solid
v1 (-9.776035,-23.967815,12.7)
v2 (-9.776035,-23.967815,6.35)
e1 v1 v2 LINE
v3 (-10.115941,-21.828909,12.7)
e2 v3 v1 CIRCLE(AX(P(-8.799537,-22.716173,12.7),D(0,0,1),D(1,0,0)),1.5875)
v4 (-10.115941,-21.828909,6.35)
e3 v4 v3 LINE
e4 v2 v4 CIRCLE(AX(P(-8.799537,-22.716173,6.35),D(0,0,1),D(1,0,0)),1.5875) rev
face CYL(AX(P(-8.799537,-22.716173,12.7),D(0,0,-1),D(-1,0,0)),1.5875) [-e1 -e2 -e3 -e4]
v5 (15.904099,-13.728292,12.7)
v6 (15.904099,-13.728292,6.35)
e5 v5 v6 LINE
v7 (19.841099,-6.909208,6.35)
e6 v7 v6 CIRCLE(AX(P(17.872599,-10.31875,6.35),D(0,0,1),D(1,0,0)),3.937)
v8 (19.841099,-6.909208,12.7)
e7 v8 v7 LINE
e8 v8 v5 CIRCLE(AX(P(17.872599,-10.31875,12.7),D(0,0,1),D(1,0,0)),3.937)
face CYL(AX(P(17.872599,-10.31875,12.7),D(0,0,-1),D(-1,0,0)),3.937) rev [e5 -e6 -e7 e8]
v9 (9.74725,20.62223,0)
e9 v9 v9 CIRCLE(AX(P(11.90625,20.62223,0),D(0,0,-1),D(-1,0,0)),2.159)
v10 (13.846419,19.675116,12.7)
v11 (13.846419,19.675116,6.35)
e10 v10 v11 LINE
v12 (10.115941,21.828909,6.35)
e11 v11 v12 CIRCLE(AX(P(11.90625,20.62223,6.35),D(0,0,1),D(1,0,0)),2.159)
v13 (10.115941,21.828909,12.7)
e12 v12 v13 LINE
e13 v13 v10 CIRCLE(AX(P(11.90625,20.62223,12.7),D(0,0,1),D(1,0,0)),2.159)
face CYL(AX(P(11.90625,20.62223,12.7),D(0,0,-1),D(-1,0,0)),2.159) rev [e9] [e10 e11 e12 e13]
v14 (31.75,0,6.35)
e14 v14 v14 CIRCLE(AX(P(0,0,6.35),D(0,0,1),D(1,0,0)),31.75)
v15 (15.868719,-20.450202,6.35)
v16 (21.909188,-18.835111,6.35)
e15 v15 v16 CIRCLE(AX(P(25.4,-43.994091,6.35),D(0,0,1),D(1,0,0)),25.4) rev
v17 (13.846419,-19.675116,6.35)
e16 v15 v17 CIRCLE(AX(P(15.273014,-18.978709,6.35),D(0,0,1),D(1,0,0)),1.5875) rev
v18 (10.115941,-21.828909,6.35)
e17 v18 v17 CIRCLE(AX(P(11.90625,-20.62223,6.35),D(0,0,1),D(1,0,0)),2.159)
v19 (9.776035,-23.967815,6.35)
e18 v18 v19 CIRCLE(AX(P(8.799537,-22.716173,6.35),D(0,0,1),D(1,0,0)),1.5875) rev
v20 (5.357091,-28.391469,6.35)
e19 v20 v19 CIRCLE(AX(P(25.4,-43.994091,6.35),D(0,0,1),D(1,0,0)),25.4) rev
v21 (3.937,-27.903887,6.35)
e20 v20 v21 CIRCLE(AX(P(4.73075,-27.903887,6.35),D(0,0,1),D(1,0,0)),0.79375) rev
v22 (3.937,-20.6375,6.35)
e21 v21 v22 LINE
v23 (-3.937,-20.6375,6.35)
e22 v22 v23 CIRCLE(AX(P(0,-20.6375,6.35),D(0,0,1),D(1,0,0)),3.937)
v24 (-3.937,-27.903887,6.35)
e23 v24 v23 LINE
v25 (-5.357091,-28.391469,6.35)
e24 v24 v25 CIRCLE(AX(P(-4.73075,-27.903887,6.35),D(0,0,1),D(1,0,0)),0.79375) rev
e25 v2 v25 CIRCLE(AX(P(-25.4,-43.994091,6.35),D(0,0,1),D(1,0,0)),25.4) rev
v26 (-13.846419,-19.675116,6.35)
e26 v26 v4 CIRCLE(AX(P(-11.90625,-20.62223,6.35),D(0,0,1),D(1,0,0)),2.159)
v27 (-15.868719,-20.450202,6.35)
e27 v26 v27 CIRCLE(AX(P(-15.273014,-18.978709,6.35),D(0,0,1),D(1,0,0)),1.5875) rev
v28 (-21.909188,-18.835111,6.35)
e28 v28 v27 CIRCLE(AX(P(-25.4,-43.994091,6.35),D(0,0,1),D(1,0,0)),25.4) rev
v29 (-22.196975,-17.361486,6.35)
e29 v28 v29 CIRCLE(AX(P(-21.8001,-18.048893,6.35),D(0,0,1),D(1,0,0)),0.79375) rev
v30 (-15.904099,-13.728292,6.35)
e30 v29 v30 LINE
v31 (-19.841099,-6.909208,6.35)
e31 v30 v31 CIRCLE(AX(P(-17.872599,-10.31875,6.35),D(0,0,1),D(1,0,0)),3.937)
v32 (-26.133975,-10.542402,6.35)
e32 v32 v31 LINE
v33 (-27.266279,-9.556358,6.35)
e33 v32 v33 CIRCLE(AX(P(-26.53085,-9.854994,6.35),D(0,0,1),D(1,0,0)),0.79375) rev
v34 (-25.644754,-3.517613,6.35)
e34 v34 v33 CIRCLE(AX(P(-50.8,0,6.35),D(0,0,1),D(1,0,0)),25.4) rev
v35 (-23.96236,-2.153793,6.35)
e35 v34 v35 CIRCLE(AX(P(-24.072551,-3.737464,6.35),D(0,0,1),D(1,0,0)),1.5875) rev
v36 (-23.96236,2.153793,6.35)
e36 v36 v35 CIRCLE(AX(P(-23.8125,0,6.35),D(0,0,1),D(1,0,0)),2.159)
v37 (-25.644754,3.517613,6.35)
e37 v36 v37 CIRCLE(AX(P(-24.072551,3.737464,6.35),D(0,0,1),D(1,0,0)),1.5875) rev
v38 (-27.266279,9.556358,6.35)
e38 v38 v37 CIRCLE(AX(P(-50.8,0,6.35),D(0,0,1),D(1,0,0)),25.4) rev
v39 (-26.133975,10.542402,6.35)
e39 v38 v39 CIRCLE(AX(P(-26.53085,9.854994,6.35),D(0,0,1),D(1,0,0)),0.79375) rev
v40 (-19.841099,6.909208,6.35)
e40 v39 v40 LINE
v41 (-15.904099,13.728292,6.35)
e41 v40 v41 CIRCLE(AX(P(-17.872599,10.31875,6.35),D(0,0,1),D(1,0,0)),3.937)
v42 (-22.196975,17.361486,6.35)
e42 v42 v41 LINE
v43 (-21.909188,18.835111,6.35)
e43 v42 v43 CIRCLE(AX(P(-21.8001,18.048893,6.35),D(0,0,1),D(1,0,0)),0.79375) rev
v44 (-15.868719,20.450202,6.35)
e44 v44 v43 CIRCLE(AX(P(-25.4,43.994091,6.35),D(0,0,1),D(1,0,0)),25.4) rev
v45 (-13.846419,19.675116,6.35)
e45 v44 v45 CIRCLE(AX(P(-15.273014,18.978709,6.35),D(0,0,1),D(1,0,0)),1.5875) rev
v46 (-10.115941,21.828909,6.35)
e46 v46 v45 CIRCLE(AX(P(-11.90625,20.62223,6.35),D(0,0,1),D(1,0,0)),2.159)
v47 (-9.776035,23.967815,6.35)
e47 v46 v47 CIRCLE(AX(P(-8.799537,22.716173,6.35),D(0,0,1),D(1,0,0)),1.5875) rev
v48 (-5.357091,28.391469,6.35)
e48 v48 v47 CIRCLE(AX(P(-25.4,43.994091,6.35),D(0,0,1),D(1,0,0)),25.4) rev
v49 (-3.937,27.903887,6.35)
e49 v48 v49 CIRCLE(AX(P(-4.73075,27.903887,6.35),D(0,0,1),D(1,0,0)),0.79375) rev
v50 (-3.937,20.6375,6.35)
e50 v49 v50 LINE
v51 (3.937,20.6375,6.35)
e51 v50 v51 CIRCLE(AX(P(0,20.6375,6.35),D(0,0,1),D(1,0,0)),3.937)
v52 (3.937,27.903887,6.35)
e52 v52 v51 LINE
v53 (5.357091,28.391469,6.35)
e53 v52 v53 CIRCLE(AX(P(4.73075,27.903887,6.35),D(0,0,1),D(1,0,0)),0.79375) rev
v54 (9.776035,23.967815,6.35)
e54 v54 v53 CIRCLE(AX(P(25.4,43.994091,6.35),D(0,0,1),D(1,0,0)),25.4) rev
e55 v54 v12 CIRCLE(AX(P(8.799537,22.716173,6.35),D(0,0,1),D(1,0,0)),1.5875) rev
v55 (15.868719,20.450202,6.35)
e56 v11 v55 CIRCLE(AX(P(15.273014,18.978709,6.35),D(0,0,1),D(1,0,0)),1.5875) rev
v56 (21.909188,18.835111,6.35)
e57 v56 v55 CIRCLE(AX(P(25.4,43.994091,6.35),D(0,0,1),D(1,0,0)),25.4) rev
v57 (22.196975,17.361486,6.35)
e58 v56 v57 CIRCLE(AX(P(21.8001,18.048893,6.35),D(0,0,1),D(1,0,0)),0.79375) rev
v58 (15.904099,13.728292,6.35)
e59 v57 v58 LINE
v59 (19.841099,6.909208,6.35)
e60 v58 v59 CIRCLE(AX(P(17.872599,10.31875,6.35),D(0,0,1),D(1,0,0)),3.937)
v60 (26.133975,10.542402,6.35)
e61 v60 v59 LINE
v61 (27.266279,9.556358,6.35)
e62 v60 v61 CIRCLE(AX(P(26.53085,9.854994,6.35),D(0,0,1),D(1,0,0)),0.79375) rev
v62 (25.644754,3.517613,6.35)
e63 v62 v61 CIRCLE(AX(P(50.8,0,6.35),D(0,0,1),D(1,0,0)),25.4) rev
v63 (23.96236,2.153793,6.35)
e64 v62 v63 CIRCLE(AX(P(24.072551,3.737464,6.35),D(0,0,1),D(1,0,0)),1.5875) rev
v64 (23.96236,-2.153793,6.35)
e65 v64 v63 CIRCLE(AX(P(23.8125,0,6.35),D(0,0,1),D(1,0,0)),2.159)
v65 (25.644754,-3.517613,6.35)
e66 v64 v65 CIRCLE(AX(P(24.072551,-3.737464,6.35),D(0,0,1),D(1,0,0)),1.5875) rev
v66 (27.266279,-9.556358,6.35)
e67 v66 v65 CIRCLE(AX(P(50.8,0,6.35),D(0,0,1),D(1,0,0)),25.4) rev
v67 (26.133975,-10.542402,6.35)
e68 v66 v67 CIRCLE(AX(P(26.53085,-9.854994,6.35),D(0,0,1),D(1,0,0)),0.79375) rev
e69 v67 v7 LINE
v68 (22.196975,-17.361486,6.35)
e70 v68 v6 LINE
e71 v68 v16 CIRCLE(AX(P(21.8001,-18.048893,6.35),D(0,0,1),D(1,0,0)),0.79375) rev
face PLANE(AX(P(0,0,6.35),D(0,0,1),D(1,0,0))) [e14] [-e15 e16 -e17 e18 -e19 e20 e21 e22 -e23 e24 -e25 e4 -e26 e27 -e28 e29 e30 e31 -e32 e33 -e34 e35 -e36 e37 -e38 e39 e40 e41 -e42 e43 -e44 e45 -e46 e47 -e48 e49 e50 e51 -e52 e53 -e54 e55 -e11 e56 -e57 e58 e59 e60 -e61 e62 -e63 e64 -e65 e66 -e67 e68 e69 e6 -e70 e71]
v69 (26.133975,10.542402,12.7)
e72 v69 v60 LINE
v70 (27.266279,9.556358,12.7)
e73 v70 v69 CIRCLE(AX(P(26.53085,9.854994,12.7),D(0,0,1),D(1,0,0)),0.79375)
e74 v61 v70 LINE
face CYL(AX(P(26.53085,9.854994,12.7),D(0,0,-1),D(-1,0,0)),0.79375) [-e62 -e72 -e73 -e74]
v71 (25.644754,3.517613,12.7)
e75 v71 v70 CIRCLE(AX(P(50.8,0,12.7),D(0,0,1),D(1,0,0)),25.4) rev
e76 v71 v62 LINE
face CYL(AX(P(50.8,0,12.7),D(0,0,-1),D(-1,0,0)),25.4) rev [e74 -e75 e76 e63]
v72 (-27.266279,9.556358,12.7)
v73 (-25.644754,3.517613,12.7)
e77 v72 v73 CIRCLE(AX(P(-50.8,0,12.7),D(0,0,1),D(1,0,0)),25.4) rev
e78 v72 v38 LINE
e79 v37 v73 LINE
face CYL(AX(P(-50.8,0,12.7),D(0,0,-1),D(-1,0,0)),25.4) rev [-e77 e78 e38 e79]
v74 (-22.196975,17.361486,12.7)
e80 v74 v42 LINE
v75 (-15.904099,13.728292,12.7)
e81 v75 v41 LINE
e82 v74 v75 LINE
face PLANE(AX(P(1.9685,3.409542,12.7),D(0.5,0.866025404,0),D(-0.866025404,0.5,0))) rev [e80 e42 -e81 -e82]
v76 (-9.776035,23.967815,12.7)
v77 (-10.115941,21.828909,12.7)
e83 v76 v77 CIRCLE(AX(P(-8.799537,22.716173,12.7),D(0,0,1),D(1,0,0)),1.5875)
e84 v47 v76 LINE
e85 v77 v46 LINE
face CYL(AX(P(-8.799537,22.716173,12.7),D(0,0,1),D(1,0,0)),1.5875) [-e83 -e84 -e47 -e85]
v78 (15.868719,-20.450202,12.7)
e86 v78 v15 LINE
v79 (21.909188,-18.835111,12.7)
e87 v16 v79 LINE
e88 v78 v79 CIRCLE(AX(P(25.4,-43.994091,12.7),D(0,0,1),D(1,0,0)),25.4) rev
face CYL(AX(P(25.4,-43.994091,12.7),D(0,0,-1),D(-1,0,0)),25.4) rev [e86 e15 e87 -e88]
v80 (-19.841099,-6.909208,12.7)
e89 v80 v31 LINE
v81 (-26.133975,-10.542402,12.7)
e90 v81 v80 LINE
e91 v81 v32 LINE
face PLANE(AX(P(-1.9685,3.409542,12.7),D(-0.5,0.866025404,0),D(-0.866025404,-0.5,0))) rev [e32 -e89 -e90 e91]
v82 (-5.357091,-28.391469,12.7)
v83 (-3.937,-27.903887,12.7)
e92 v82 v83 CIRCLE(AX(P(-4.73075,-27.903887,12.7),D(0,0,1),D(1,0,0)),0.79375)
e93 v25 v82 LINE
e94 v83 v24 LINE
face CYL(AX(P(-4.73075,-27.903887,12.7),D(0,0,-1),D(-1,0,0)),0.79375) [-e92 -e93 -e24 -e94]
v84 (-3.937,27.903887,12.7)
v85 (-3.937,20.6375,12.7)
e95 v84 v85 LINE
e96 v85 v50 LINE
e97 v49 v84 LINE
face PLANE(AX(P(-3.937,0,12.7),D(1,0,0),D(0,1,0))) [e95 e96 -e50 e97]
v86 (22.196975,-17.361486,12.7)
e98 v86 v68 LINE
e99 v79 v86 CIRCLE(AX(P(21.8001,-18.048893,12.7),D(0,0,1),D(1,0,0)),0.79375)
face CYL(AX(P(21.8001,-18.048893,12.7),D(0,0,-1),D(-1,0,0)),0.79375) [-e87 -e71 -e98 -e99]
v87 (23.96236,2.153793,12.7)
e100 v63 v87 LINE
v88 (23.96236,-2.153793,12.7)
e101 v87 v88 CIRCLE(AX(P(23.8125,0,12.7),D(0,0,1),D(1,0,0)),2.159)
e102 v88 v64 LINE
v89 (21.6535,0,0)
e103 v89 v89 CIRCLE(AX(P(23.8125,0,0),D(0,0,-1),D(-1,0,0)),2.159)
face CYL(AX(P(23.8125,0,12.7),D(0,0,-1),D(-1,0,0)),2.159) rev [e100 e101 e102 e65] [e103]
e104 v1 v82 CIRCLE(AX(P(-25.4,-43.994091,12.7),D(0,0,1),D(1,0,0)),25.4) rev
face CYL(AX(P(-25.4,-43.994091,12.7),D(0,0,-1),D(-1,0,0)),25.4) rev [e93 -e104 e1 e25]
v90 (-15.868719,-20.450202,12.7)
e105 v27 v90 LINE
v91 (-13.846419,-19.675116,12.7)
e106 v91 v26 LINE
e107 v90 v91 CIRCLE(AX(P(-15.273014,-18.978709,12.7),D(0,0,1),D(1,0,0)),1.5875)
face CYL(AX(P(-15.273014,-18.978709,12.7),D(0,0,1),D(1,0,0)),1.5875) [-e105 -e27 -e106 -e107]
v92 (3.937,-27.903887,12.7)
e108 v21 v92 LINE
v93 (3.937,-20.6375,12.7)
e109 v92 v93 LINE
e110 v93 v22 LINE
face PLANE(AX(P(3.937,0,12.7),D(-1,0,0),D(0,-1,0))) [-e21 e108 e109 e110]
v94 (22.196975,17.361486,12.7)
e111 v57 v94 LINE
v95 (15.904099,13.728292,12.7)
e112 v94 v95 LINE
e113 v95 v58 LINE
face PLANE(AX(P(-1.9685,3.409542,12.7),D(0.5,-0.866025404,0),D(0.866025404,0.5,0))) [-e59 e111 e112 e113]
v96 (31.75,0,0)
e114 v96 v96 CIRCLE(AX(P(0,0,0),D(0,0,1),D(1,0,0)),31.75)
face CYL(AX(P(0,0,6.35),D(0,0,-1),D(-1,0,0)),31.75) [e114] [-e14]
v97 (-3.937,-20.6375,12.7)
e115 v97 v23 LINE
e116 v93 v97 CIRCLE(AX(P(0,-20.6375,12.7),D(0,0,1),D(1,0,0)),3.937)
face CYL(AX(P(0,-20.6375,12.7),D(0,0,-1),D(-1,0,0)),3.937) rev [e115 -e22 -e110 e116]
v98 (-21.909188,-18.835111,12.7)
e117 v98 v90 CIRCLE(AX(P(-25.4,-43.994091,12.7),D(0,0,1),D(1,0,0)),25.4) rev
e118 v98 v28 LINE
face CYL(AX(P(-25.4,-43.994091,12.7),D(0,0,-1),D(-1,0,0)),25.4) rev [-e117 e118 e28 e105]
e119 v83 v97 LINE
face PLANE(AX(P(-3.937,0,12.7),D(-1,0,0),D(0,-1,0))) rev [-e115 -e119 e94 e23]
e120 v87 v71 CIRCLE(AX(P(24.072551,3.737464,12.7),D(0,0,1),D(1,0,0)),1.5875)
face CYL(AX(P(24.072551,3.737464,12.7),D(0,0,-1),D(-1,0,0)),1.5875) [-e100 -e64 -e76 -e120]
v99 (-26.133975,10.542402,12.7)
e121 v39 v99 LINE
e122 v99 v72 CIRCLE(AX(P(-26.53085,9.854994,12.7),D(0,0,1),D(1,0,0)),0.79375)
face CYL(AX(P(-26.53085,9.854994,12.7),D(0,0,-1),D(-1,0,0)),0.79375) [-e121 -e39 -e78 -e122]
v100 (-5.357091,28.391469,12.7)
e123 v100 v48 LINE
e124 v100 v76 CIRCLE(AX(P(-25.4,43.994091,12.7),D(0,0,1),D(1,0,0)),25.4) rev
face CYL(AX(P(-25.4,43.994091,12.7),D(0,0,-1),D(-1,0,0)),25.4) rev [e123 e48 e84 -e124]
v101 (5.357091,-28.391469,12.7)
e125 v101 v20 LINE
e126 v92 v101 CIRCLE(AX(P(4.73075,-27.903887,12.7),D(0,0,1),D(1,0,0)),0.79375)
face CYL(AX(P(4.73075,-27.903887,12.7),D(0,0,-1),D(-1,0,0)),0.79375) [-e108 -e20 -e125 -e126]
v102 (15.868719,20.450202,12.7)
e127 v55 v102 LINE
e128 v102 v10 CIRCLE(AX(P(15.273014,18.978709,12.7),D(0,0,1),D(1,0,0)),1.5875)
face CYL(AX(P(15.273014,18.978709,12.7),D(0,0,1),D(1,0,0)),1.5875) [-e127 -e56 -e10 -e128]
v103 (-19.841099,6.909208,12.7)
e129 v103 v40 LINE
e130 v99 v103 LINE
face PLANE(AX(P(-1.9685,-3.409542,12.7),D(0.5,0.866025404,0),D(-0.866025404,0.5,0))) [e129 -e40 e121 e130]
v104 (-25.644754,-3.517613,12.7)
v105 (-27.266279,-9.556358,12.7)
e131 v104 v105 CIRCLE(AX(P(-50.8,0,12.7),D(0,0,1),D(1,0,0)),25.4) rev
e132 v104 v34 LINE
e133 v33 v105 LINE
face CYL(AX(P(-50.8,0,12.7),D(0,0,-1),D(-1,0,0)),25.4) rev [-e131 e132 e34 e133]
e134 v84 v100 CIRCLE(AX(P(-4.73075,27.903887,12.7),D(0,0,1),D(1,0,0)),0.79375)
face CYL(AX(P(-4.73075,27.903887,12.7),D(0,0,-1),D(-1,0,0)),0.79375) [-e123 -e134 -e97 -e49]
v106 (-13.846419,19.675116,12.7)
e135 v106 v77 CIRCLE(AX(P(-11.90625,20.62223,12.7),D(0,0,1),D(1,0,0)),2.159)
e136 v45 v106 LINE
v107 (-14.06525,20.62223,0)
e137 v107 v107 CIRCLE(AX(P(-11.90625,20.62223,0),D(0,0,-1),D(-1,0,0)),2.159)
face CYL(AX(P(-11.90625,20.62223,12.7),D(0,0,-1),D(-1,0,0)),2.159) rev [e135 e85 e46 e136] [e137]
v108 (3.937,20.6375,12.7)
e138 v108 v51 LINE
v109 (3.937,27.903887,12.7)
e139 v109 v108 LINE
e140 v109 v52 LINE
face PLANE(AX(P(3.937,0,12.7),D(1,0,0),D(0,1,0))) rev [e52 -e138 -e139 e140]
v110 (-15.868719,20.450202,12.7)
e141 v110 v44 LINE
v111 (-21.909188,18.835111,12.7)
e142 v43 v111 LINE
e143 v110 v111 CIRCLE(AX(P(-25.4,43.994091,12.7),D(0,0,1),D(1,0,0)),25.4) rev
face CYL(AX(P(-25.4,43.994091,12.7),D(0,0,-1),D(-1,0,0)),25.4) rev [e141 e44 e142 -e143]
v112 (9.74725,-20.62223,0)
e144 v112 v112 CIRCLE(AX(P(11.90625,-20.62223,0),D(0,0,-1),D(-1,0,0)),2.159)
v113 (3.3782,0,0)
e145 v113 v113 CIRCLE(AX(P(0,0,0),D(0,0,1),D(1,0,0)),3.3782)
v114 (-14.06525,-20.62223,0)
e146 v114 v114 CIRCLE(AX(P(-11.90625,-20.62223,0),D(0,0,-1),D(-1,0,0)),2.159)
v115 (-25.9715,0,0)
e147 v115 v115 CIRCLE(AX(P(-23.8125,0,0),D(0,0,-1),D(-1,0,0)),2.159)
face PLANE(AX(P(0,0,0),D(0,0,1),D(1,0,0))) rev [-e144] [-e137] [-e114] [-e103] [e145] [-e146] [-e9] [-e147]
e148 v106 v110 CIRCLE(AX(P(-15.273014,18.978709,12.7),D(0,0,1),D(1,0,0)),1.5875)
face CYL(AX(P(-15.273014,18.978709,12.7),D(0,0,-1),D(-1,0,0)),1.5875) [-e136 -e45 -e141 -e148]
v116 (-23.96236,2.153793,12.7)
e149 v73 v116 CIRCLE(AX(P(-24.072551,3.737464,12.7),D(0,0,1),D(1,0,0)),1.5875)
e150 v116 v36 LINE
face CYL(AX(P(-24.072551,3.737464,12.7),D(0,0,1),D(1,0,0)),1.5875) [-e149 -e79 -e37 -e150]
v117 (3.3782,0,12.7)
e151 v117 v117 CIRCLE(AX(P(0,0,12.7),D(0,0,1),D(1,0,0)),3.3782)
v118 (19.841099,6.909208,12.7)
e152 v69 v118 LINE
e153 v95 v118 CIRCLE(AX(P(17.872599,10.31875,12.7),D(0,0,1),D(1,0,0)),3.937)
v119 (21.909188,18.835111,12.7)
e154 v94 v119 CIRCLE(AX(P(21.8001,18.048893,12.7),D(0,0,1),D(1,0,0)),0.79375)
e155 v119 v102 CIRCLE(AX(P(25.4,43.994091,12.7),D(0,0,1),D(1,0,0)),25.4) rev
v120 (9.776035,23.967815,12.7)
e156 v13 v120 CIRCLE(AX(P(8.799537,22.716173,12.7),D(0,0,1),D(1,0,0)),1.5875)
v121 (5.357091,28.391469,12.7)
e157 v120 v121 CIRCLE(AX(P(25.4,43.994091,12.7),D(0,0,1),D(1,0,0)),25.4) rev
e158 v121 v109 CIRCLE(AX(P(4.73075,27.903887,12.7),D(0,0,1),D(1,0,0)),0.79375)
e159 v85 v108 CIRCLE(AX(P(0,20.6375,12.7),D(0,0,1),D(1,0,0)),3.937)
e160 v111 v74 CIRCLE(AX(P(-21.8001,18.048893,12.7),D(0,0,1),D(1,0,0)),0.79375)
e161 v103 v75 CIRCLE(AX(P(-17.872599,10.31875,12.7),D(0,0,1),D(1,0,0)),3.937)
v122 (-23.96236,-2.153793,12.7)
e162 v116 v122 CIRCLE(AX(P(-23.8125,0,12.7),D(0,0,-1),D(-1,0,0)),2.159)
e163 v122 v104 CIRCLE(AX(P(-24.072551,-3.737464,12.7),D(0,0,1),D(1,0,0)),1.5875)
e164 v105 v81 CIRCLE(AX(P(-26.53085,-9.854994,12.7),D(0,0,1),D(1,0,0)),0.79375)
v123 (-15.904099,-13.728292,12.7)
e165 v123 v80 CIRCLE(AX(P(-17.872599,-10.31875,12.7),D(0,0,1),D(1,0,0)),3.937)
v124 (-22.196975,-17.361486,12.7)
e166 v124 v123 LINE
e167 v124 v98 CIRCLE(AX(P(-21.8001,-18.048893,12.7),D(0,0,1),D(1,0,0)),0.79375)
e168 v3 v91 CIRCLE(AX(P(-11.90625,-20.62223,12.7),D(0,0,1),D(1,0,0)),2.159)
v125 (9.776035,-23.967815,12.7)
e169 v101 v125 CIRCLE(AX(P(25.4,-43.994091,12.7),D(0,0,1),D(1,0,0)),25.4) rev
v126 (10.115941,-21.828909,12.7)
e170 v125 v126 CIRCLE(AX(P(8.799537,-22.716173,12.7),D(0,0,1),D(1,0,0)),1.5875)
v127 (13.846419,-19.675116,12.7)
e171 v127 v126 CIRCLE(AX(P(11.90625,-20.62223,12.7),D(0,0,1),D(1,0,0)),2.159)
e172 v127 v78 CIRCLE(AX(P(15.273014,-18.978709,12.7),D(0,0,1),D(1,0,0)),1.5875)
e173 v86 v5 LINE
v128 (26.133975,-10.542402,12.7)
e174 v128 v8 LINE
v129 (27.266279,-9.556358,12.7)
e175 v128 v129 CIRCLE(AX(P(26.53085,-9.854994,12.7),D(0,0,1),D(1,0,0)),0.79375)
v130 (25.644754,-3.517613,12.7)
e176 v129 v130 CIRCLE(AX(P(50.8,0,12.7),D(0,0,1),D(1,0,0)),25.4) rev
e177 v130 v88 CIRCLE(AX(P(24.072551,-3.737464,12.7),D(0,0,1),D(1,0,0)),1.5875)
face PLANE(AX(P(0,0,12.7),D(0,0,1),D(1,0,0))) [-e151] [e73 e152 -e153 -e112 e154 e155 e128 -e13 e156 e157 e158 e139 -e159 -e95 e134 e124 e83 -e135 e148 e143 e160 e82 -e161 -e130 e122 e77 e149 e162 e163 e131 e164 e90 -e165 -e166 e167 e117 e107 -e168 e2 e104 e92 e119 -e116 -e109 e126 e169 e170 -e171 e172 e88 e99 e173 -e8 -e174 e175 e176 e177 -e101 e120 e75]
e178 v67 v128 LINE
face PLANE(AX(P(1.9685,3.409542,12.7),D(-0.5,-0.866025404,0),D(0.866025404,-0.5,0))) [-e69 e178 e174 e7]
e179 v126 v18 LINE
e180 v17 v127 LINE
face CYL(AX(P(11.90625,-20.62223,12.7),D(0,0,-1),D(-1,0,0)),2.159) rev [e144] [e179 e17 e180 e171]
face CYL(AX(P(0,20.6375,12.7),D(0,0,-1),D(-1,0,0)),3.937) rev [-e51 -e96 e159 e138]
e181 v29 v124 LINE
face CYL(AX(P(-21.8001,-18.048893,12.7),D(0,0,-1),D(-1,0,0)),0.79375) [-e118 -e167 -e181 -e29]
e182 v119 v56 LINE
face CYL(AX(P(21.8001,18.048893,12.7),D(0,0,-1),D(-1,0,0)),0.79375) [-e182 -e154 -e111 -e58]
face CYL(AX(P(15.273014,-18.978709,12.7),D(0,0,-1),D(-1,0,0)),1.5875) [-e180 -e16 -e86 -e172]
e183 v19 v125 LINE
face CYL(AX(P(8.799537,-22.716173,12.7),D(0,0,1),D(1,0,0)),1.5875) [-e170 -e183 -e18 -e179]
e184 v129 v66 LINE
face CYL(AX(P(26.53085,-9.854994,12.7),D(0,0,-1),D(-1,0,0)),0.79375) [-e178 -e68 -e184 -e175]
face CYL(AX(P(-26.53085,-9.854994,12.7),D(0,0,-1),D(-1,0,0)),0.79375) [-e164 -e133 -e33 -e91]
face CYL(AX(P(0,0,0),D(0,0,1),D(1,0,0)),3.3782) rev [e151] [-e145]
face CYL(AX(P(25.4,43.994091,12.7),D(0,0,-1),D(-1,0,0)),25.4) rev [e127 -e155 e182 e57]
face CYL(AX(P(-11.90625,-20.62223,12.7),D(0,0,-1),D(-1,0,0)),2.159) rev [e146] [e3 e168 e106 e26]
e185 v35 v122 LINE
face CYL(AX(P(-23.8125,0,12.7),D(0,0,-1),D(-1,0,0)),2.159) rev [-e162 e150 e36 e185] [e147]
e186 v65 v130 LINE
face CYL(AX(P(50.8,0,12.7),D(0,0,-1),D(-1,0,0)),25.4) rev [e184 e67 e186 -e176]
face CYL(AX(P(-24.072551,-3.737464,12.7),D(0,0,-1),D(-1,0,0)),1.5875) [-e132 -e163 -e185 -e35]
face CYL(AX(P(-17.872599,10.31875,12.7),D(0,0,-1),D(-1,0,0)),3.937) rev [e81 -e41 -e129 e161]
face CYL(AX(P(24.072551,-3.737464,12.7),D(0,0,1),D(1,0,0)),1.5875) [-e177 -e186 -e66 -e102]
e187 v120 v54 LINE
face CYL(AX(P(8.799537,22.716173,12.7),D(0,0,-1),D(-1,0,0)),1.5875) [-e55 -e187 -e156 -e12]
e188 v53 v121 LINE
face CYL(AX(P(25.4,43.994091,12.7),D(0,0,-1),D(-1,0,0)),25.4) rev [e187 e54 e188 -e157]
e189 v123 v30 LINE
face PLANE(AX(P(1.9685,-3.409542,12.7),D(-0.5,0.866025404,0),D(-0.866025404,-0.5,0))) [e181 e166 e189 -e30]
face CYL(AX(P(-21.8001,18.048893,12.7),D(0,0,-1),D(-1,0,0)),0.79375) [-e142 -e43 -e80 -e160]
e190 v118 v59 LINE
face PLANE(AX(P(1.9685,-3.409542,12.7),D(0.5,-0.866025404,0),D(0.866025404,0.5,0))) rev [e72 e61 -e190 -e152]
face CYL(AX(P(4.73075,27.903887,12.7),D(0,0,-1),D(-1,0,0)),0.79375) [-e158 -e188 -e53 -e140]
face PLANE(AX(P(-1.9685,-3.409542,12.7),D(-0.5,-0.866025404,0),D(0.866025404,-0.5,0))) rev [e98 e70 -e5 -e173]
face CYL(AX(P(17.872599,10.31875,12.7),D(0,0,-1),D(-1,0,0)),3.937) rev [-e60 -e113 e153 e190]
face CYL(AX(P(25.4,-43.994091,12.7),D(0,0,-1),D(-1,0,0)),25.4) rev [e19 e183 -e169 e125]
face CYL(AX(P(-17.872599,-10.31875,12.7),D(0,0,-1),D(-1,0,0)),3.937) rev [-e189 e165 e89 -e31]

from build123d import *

# Parameters (mm, degrees)
SKETCH2_R           = 31.75
BOSS_EXTRUDE1_DEPTH = 6.35
BOSS_EXTRUDE2_DEPTH = 6.35
SKETCH4_R           = 3.3782
CUT_EXTRUDE1_DEPTH  = 47.6627796
FILLET2_R           = 0.79375
SKETCH5_R           = 2.159
CUT_EXTRUDE2_DEPTH  = 47.6627796
FILLET3_R           = 1.5875


with BuildPart() as part:
    # Sketch2 → Boss-Extrude1 (new body)
    with BuildSketch(Plane.XY):
        Circle(SKETCH2_R)
    extrude(amount=BOSS_EXTRUDE1_DEPTH)

    # Sketch3 → Boss-Extrude2 (add)
    with BuildSketch(Plane.XY.offset(6.35)):
        with BuildLine():
            Line((3.937, 30.411026388), (3.937, 20.6375))
            ThreePointArc((3.937, 20.6375), (0, 16.7005), (-3.937, 20.6375))
            Line((-3.937, 20.6375), (-3.937, 30.411026388))
            ThreePointArc((-3.937, 30.411026388), (-12.7, 21.997045256), (-24.368221407, 18.615055209))
            Line((-24.368221407, 18.615055209), (-15.904099271, 13.728292015))
            ThreePointArc((-15.904099271, 13.728292015), (-14.463057256, 8.35025), (-19.841099271, 6.909207985))
            Line((-19.841099271, 6.909207985), (-28.305221407, 11.795971179))
            ThreePointArc((-28.305221407, 11.795971179), (-25.4, 0), (-28.305221407, -11.795971179))
            Line((-28.305221407, -11.795971179), (-19.841099271, -6.909207985))
            ThreePointArc((-19.841099271, -6.909207985), (-14.463057256, -8.35025), (-15.904099271, -13.728292015))
            Line((-15.904099271, -13.728292015), (-24.368221407, -18.615055209))
            ThreePointArc((-24.368221407, -18.615055209), (-12.7, -21.997045256), (-3.937, -30.411026388))
            Line((-3.937, -30.411026388), (-3.937, -20.6375))
            ThreePointArc((-3.937, -20.6375), (0, -16.7005), (3.937, -20.6375))
            Line((3.937, -20.6375), (3.937, -30.411026388))
            ThreePointArc((3.937, -30.411026388), (12.7, -21.997045256), (24.368221407, -18.615055209))
            Line((24.368221407, -18.615055209), (15.904099271, -13.728292015))
            ThreePointArc((15.904099271, -13.728292015), (14.463057256, -8.35025), (19.841099271, -6.909207985))
            Line((19.841099271, -6.909207985), (28.305221407, -11.795971179))
            ThreePointArc((28.305221407, -11.795971179), (25.4, 0), (28.305221407, 11.795971179))
            Line((28.305221407, 11.795971179), (19.841099271, 6.909207985))
            ThreePointArc((19.841099271, 6.909207985), (14.463057256, 8.35025), (15.904099271, 13.728292015))
            Line((15.904099271, 13.728292015), (24.368221407, 18.615055209))
            ThreePointArc((24.368221407, 18.615055209), (12.7, 21.997045256), (3.937, 30.411026388))
        make_face()
    extrude(amount=BOSS_EXTRUDE2_DEPTH)

    # Sketch4 → Cut-Extrude1 (cut, through all)
    with BuildSketch(Plane.XY.offset(12.7)):
        Circle(SKETCH4_R)
    extrude(amount=-CUT_EXTRUDE1_DEPTH, mode=Mode.SUBTRACT)

    # Fillet2
    fillet2_edges = [part.edges().sort_by_distance(p)[0] for p in [
        (-28.305221407, 11.795971179, 9.525),
        (-28.305221407, -11.795971179, 9.525),
        (-24.368221407, -18.615055209, 9.525),
        (-3.937, -30.411026388, 9.525),
        (3.937, -30.411026388, 9.525),
        (24.368221407, -18.615055209, 9.525),
        (28.305221407, -11.795971179, 9.525),
        (28.305221407, 11.795971179, 9.525),
        (24.368221407, 18.615055209, 9.525),
        (3.937, 30.411026388, 9.525),
        (-3.937, 30.411026388, 9.525),
        (-24.368221407, 18.615055209, 9.525),
    ]]
    fillet(fillet2_edges, radius=FILLET2_R)

    # Sketch5 → Cut-Extrude2 (cut, through all)
    with BuildSketch(Plane(origin=(0, 0, 0), x_dir=(-1, 0, 0), z_dir=(0, 0, -1))):
        with Locations((-11.90625, 20.622229928)):
            Circle(SKETCH5_R)
        with Locations((11.90625, 20.622229928)):
            Circle(SKETCH5_R)
        with Locations((23.8125, 0)):
            Circle(SKETCH5_R)
        with Locations((11.90625, -20.622229928)):
            Circle(SKETCH5_R)
        with Locations((-11.90625, -20.622229928)):
            Circle(SKETCH5_R)
        with Locations((-23.8125, 0)):
            Circle(SKETCH5_R)
    extrude(amount=-CUT_EXTRUDE2_DEPTH, mode=Mode.SUBTRACT)

    # Fillet3
    # the kernel refuses this fillet: 1.5875 mm, written as the material it takes off along each edge
    with BuildSketch(Plane(origin=(25.439668824, 1.419014665, 17.971488678), x_dir=(-0.895364972347459, 0.44533309588804865, 0), z_dir=(0, 0, -1)), Plane(origin=(13.94873716, -21.321892132, 17.971488678), x_dir=(-0.062012711988979966, 0.9980753596556584, 0), z_dir=(0, 0, -1)), Plane(origin=(-11.490931663, -22.740906798, 17.971488678), x_dir=(0.8333522603583425, 0.5527422637682424, 0), z_dir=(0, 0, -1)), Plane(origin=(-25.439668824, -1.419014665, 17.971488678), x_dir=(0.895364972347876, -0.44533309588721026, 0), z_dir=(0, 0, -1)), Plane(origin=(-13.94873716, 21.321892132, 17.971488678), x_dir=(0.06201271198937459, -0.998075359655634, 0), z_dir=(0, 0, -1)), Plane(origin=(11.490931663, 22.740906798, 17.971488678), x_dir=(-0.8333522603586354, -0.552742263767801, 0), z_dir=(0, 0, -1))) as fillet3_piece_1:
        with BuildLine():
            CenterArc((2.256551384, 1.467035409), FILLET3_R, 161.515751163, 86.019798363)
            ThreePointArc((0.75094916, 1.970342665), (0.395929534, 0.977375414), (0, 0))
            ThreePointArc((0, 0), (0.824975775, 0.163831844), (1.64995155, 0))
        make_face()
    extrude(amount=11.621488678, mode=Mode.SUBTRACT)
    with BuildSketch(Plane(origin=(25.439668824, -1.419014665, 17.971488678), x_dir=(0.09726153154123053, -0.9952588580275255, 0), z_dir=(0, 0, -1)), Plane(origin=(11.490931663, -22.740906798, 17.971488678), x_dir=(-0.8132886886226861, -0.581860386139486, 0), z_dir=(0, 0, -1)), Plane(origin=(-13.94873716, -21.321892132, 17.971488678), x_dir=(-0.9105502201639705, 0.4133984718880138, 0), z_dir=(0, 0, -1)), Plane(origin=(-25.439668824, 1.419014665, 17.971488678), x_dir=(-0.09726153154127945, 0.9952588580275207, 0), z_dir=(0, 0, -1)), Plane(origin=(-11.490931663, 22.740906798, 17.971488678), x_dir=(0.8132886886227111, 0.5818603861394509, 0), z_dir=(0, 0, -1)), Plane(origin=(13.94873716, 21.321892132, 17.971488678), x_dir=(0.9105502201639343, -0.41339847188809375, 0), z_dir=(0, 0, -1))) as fillet3_piece_2:
        with BuildLine():
            CenterArc((2.17448908, 1.586131862), FILLET3_R, 181.601297313, 86.019798363)
            ThreePointArc((0.587609026, 1.541770329), (0.446894509, 0.71253856), (0, 0))
            ThreePointArc((0, 0), (1.054297736, 0.021890215), (2.108595471, 0))
        make_face()
    extrude(amount=11.621488678, mode=Mode.SUBTRACT)


solid = part.part
